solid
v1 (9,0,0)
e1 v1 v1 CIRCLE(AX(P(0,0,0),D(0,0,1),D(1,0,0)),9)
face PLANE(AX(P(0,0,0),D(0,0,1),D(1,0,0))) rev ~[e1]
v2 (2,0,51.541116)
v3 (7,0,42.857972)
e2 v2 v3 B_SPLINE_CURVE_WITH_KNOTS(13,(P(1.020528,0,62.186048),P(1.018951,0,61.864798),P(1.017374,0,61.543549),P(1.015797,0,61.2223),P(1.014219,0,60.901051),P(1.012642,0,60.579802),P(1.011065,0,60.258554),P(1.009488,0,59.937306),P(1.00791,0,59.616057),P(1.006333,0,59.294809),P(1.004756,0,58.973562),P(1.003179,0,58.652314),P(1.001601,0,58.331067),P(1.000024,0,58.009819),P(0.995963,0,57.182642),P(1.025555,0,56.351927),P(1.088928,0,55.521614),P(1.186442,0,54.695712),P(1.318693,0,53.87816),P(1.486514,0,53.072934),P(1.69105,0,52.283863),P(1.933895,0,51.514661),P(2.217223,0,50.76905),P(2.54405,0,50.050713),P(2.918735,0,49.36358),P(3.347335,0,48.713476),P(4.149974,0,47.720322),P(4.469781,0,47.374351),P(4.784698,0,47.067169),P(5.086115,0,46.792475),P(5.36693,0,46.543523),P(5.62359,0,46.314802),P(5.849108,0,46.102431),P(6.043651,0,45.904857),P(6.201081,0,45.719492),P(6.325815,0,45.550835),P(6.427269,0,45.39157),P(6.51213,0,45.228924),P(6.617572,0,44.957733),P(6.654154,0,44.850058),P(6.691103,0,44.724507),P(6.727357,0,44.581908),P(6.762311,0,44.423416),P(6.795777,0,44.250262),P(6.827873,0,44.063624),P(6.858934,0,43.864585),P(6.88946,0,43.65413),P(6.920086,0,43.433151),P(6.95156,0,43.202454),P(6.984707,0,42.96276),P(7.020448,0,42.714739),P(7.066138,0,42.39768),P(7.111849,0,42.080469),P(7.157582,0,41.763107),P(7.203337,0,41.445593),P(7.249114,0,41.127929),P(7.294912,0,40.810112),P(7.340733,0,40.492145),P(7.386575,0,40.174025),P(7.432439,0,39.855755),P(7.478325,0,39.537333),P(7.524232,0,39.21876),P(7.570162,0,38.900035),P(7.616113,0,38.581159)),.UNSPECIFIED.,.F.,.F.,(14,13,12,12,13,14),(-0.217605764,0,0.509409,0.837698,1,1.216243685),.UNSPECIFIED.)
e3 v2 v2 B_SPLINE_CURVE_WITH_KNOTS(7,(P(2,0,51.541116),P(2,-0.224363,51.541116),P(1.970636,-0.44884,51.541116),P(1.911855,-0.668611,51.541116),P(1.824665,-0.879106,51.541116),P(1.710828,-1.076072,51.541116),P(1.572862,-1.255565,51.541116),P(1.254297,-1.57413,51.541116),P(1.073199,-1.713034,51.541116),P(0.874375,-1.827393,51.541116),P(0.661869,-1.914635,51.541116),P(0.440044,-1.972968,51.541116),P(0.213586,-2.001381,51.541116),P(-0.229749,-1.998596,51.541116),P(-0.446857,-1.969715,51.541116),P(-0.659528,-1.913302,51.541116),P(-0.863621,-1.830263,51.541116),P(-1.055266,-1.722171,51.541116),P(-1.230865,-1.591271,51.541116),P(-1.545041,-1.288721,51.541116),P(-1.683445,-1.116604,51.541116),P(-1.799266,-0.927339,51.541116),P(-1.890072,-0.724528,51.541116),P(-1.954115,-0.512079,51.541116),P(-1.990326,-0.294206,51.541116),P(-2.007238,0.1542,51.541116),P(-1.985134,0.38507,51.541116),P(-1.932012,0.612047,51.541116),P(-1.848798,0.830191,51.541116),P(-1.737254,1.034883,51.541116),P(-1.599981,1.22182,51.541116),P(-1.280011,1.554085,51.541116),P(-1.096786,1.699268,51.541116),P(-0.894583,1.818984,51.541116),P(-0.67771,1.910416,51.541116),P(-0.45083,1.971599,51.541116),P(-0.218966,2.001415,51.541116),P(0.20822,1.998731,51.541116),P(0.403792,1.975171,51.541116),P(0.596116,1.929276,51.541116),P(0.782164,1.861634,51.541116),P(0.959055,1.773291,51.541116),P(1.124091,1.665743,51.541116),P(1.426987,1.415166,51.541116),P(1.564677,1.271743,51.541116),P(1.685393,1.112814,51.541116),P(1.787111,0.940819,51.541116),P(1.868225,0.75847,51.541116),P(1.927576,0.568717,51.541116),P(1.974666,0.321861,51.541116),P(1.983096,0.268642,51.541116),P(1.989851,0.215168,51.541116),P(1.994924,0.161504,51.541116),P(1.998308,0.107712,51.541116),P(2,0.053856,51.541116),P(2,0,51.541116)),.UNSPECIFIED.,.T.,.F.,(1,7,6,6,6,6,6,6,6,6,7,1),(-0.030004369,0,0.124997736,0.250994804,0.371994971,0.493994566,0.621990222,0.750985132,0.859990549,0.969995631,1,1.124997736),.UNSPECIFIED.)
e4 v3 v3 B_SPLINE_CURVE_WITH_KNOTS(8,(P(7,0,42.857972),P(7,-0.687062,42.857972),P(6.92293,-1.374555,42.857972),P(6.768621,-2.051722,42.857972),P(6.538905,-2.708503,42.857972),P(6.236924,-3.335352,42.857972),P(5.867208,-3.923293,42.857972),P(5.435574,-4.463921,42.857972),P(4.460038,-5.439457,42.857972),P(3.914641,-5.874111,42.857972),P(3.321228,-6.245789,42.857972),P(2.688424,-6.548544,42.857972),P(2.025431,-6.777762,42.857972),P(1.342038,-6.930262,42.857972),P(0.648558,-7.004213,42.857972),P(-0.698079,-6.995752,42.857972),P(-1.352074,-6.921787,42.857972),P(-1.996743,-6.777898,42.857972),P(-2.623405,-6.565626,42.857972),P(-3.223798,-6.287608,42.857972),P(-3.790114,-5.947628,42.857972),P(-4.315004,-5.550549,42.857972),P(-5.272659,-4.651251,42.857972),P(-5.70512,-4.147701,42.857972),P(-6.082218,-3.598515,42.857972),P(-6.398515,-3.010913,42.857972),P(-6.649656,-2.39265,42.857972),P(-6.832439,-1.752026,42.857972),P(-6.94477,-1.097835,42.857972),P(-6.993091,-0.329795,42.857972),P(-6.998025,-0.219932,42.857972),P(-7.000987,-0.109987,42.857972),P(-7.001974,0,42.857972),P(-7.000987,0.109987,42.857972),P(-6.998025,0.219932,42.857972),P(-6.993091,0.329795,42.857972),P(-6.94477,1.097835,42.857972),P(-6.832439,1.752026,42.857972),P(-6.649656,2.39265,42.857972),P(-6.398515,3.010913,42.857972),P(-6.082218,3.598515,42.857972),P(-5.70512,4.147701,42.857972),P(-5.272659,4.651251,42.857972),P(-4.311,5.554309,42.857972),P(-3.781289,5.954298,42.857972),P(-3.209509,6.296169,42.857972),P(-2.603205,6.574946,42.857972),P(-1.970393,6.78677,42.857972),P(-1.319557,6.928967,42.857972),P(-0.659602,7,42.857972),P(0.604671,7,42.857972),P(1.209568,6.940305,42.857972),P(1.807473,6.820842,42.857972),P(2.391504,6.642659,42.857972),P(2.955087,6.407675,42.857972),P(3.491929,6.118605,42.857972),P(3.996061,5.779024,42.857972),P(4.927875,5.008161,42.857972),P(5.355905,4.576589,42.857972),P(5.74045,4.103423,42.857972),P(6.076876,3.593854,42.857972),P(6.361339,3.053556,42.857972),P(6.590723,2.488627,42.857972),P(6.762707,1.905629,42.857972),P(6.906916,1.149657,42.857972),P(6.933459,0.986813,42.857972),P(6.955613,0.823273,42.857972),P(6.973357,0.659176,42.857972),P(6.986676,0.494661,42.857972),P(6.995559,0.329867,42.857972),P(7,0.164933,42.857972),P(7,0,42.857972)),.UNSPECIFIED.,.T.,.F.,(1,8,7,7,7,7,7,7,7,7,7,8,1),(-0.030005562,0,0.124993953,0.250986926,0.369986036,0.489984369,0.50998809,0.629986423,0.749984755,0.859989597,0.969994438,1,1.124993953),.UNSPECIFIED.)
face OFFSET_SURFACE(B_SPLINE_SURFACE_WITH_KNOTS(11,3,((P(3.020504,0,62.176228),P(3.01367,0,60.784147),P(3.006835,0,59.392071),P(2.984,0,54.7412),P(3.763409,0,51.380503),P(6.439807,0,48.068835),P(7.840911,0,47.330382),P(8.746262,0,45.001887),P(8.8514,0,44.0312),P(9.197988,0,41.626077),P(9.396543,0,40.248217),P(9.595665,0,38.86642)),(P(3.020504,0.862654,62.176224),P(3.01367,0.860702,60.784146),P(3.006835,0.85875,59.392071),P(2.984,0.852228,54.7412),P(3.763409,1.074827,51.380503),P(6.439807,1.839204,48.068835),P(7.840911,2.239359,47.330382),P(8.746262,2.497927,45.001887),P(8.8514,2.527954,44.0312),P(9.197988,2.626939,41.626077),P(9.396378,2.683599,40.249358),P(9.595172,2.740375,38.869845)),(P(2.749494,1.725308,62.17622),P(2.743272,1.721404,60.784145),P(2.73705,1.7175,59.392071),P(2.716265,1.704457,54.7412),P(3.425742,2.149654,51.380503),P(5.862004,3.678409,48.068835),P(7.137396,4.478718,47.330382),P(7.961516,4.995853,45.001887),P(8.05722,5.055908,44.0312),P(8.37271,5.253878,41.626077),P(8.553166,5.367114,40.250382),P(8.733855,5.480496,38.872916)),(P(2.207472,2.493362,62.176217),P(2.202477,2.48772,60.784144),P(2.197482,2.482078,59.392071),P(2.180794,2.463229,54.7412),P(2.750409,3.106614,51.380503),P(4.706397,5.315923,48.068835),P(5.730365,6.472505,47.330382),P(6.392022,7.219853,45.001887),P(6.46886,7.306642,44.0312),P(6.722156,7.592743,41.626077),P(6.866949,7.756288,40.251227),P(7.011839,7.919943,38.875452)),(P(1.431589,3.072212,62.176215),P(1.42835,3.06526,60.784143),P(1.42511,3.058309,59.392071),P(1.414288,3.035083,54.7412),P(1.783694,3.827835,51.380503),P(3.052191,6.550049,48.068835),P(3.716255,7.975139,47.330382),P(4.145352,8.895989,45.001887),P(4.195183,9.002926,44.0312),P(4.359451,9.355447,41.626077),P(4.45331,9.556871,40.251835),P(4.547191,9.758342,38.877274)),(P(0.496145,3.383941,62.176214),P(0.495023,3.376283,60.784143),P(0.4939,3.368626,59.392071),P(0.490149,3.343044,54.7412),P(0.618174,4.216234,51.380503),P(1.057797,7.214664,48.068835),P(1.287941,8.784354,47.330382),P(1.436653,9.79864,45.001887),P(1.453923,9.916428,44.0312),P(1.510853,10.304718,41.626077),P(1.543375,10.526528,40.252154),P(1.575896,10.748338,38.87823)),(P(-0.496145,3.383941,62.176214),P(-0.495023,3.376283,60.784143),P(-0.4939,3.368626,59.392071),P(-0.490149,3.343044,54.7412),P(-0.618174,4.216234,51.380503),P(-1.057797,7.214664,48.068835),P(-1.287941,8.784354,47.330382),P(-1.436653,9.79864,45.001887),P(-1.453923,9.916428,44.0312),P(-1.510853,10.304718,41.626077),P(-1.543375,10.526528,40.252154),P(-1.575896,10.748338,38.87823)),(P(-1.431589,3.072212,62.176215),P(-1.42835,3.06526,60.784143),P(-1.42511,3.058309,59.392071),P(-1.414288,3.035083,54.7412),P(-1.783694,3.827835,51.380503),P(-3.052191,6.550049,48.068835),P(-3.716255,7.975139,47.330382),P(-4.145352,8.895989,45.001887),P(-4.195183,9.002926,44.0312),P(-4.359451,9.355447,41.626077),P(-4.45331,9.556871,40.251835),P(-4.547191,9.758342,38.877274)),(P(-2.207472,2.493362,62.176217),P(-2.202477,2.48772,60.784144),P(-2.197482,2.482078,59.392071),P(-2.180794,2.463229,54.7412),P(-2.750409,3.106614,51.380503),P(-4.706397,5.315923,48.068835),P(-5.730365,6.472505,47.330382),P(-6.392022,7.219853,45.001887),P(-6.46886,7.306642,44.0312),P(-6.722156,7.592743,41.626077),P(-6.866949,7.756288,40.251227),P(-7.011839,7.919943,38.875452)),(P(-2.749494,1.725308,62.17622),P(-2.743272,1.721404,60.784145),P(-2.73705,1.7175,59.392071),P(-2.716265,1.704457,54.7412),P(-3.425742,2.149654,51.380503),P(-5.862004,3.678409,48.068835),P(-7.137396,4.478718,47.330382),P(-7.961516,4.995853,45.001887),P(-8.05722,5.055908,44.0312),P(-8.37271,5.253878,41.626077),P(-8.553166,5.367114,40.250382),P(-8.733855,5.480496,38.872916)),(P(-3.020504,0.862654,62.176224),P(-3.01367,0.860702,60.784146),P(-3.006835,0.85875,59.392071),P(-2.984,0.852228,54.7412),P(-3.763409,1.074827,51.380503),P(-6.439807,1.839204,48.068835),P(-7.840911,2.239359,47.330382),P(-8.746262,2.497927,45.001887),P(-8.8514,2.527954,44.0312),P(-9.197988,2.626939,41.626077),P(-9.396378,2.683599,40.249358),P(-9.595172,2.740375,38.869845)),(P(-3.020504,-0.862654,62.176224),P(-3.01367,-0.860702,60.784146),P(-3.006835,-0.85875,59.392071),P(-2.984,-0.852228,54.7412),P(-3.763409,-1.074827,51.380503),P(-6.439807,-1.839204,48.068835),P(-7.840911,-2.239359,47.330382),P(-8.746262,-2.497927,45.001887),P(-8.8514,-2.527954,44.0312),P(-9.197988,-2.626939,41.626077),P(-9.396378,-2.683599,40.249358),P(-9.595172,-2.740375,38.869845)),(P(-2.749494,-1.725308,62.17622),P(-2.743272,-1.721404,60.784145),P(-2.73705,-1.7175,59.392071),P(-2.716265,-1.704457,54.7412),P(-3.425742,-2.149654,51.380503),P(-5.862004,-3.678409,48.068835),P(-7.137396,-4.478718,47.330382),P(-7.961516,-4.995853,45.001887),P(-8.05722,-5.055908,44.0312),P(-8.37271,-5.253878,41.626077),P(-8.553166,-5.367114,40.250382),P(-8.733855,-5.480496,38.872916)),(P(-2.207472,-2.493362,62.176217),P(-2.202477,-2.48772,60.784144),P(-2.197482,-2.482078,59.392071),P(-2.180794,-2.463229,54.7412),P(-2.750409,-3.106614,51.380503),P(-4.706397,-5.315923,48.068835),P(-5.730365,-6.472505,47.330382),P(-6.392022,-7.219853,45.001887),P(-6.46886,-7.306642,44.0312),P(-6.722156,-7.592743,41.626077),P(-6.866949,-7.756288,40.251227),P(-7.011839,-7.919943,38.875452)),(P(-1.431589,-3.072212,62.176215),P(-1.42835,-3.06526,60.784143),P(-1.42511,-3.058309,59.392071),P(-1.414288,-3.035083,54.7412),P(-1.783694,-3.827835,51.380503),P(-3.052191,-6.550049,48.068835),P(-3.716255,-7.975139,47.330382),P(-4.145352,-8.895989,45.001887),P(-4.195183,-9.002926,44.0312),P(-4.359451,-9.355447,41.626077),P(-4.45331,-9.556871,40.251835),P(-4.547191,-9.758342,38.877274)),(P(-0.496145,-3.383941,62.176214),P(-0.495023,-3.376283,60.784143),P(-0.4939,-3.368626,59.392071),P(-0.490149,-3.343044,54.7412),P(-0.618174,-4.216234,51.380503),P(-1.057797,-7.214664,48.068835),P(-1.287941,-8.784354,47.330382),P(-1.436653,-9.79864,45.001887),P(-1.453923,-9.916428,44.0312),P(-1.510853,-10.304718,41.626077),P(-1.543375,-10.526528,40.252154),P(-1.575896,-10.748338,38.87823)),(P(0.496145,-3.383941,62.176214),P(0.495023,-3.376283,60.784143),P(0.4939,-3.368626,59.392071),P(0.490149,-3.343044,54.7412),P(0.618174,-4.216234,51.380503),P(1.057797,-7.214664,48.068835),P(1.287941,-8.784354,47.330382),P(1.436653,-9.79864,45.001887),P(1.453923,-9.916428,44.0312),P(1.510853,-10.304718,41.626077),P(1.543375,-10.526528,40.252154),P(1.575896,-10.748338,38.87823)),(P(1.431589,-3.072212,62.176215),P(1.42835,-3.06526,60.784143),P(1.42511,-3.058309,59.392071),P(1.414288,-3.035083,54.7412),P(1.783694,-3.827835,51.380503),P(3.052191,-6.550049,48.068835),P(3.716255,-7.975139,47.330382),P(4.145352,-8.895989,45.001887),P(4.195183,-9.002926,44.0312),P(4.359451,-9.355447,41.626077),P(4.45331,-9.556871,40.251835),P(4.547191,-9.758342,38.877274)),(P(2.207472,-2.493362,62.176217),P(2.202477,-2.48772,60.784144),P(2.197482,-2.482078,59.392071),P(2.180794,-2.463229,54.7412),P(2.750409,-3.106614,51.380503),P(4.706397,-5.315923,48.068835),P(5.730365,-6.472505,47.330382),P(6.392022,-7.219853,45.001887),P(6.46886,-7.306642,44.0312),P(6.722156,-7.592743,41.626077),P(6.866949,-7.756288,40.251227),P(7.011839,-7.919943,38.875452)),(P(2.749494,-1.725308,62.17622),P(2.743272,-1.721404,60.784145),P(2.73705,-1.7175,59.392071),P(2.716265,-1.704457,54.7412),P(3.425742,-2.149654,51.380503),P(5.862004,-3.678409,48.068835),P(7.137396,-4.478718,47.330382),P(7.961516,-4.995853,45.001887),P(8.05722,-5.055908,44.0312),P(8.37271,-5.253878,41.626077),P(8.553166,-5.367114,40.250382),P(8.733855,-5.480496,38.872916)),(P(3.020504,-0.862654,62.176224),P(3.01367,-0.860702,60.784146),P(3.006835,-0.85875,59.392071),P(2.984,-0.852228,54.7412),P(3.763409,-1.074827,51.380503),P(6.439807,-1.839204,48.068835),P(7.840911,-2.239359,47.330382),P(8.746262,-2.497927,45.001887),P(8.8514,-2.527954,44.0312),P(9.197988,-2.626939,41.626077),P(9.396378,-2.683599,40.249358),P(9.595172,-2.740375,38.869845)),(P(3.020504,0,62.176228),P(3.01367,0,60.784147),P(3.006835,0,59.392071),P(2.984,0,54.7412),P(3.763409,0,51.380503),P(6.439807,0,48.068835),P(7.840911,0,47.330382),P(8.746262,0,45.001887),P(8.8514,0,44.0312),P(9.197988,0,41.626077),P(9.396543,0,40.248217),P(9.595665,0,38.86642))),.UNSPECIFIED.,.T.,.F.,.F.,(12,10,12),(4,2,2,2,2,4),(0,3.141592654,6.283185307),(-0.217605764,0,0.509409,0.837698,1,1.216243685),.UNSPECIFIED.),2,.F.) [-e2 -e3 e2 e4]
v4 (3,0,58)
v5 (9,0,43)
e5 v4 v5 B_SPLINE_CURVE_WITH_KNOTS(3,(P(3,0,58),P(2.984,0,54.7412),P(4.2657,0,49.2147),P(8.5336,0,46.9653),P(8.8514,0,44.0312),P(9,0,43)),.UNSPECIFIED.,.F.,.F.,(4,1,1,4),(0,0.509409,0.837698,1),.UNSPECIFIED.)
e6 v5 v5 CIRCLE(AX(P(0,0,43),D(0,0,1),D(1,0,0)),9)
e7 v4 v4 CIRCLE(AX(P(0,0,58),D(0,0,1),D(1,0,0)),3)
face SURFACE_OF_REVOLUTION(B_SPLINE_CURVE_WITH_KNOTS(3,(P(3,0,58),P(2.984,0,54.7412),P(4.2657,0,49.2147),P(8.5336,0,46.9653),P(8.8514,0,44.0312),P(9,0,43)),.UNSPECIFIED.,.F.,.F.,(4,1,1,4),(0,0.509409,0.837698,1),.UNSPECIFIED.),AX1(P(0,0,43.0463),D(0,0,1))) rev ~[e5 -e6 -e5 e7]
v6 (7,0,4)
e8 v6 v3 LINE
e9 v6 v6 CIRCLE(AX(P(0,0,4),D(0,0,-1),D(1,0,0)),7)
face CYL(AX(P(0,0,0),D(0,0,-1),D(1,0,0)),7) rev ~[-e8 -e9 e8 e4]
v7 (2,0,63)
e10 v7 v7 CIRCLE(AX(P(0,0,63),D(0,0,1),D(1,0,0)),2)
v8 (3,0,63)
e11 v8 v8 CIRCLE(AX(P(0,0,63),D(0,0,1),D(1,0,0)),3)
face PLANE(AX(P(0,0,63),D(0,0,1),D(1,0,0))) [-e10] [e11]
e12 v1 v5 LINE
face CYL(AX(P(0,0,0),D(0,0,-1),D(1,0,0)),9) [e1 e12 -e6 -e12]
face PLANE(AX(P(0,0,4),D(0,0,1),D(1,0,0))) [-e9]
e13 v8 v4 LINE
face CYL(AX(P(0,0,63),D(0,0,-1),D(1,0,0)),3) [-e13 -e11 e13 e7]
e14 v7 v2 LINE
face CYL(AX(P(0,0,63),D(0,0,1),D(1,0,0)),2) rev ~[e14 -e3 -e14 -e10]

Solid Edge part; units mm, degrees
sketch "Sketch1" plane through (0, 0, 0) normal (0, 0, 1) x (1, 0, 0)
  circle A0 centre (0, 0) radius 9
extrude "Protrusion1" add sketch "Sketch1" along normal blind 63
sketch "Sketch2" plane through (0, 0, 0) normal (0, -1, 0) x (1, 0, 0)
  line L0 (12.5226, 43) -> (12.5226, 68.3546)
  line L1 (12.5226, 68.3546) -> (3, 68.3546)
  line L2 (3, 68.3546) -> (3, 63)
  line L3 (3, 63) -> (3, 58)
  spline S0 degree 3 poles (3, 58) (2.984, 54.7412) (4.2657, 49.2147) (8.5336, 46.9653) (8.8514, 44.0312) (9, 43) knots 0 0 0 0 0.509409 0.837698 1 1 1 1
  line L4 (9, 43) -> (12.5226, 43)
revolve "RevolvedCutout1" cut sketch "Sketch2" angle 360 about axis through (0, 0, 43.0463) along (0, 0, 1)
shell "Thinwall_1" thickness 4 removed faces 0 other thickness 2 on face (4.9805, 7.4963, 35.4033) other thickness 2 on face (1.6602, 2.4988, 62.1167)
sketch "Sketch3" plane through (0, 0, 63) normal (0, 0, 1) x (1, 0, 0)
  circle A0 centre (0, 0) radius 2
extrude "ExtrudedCutout_1" cut sketch "Sketch3" against normal blind 47.9511
